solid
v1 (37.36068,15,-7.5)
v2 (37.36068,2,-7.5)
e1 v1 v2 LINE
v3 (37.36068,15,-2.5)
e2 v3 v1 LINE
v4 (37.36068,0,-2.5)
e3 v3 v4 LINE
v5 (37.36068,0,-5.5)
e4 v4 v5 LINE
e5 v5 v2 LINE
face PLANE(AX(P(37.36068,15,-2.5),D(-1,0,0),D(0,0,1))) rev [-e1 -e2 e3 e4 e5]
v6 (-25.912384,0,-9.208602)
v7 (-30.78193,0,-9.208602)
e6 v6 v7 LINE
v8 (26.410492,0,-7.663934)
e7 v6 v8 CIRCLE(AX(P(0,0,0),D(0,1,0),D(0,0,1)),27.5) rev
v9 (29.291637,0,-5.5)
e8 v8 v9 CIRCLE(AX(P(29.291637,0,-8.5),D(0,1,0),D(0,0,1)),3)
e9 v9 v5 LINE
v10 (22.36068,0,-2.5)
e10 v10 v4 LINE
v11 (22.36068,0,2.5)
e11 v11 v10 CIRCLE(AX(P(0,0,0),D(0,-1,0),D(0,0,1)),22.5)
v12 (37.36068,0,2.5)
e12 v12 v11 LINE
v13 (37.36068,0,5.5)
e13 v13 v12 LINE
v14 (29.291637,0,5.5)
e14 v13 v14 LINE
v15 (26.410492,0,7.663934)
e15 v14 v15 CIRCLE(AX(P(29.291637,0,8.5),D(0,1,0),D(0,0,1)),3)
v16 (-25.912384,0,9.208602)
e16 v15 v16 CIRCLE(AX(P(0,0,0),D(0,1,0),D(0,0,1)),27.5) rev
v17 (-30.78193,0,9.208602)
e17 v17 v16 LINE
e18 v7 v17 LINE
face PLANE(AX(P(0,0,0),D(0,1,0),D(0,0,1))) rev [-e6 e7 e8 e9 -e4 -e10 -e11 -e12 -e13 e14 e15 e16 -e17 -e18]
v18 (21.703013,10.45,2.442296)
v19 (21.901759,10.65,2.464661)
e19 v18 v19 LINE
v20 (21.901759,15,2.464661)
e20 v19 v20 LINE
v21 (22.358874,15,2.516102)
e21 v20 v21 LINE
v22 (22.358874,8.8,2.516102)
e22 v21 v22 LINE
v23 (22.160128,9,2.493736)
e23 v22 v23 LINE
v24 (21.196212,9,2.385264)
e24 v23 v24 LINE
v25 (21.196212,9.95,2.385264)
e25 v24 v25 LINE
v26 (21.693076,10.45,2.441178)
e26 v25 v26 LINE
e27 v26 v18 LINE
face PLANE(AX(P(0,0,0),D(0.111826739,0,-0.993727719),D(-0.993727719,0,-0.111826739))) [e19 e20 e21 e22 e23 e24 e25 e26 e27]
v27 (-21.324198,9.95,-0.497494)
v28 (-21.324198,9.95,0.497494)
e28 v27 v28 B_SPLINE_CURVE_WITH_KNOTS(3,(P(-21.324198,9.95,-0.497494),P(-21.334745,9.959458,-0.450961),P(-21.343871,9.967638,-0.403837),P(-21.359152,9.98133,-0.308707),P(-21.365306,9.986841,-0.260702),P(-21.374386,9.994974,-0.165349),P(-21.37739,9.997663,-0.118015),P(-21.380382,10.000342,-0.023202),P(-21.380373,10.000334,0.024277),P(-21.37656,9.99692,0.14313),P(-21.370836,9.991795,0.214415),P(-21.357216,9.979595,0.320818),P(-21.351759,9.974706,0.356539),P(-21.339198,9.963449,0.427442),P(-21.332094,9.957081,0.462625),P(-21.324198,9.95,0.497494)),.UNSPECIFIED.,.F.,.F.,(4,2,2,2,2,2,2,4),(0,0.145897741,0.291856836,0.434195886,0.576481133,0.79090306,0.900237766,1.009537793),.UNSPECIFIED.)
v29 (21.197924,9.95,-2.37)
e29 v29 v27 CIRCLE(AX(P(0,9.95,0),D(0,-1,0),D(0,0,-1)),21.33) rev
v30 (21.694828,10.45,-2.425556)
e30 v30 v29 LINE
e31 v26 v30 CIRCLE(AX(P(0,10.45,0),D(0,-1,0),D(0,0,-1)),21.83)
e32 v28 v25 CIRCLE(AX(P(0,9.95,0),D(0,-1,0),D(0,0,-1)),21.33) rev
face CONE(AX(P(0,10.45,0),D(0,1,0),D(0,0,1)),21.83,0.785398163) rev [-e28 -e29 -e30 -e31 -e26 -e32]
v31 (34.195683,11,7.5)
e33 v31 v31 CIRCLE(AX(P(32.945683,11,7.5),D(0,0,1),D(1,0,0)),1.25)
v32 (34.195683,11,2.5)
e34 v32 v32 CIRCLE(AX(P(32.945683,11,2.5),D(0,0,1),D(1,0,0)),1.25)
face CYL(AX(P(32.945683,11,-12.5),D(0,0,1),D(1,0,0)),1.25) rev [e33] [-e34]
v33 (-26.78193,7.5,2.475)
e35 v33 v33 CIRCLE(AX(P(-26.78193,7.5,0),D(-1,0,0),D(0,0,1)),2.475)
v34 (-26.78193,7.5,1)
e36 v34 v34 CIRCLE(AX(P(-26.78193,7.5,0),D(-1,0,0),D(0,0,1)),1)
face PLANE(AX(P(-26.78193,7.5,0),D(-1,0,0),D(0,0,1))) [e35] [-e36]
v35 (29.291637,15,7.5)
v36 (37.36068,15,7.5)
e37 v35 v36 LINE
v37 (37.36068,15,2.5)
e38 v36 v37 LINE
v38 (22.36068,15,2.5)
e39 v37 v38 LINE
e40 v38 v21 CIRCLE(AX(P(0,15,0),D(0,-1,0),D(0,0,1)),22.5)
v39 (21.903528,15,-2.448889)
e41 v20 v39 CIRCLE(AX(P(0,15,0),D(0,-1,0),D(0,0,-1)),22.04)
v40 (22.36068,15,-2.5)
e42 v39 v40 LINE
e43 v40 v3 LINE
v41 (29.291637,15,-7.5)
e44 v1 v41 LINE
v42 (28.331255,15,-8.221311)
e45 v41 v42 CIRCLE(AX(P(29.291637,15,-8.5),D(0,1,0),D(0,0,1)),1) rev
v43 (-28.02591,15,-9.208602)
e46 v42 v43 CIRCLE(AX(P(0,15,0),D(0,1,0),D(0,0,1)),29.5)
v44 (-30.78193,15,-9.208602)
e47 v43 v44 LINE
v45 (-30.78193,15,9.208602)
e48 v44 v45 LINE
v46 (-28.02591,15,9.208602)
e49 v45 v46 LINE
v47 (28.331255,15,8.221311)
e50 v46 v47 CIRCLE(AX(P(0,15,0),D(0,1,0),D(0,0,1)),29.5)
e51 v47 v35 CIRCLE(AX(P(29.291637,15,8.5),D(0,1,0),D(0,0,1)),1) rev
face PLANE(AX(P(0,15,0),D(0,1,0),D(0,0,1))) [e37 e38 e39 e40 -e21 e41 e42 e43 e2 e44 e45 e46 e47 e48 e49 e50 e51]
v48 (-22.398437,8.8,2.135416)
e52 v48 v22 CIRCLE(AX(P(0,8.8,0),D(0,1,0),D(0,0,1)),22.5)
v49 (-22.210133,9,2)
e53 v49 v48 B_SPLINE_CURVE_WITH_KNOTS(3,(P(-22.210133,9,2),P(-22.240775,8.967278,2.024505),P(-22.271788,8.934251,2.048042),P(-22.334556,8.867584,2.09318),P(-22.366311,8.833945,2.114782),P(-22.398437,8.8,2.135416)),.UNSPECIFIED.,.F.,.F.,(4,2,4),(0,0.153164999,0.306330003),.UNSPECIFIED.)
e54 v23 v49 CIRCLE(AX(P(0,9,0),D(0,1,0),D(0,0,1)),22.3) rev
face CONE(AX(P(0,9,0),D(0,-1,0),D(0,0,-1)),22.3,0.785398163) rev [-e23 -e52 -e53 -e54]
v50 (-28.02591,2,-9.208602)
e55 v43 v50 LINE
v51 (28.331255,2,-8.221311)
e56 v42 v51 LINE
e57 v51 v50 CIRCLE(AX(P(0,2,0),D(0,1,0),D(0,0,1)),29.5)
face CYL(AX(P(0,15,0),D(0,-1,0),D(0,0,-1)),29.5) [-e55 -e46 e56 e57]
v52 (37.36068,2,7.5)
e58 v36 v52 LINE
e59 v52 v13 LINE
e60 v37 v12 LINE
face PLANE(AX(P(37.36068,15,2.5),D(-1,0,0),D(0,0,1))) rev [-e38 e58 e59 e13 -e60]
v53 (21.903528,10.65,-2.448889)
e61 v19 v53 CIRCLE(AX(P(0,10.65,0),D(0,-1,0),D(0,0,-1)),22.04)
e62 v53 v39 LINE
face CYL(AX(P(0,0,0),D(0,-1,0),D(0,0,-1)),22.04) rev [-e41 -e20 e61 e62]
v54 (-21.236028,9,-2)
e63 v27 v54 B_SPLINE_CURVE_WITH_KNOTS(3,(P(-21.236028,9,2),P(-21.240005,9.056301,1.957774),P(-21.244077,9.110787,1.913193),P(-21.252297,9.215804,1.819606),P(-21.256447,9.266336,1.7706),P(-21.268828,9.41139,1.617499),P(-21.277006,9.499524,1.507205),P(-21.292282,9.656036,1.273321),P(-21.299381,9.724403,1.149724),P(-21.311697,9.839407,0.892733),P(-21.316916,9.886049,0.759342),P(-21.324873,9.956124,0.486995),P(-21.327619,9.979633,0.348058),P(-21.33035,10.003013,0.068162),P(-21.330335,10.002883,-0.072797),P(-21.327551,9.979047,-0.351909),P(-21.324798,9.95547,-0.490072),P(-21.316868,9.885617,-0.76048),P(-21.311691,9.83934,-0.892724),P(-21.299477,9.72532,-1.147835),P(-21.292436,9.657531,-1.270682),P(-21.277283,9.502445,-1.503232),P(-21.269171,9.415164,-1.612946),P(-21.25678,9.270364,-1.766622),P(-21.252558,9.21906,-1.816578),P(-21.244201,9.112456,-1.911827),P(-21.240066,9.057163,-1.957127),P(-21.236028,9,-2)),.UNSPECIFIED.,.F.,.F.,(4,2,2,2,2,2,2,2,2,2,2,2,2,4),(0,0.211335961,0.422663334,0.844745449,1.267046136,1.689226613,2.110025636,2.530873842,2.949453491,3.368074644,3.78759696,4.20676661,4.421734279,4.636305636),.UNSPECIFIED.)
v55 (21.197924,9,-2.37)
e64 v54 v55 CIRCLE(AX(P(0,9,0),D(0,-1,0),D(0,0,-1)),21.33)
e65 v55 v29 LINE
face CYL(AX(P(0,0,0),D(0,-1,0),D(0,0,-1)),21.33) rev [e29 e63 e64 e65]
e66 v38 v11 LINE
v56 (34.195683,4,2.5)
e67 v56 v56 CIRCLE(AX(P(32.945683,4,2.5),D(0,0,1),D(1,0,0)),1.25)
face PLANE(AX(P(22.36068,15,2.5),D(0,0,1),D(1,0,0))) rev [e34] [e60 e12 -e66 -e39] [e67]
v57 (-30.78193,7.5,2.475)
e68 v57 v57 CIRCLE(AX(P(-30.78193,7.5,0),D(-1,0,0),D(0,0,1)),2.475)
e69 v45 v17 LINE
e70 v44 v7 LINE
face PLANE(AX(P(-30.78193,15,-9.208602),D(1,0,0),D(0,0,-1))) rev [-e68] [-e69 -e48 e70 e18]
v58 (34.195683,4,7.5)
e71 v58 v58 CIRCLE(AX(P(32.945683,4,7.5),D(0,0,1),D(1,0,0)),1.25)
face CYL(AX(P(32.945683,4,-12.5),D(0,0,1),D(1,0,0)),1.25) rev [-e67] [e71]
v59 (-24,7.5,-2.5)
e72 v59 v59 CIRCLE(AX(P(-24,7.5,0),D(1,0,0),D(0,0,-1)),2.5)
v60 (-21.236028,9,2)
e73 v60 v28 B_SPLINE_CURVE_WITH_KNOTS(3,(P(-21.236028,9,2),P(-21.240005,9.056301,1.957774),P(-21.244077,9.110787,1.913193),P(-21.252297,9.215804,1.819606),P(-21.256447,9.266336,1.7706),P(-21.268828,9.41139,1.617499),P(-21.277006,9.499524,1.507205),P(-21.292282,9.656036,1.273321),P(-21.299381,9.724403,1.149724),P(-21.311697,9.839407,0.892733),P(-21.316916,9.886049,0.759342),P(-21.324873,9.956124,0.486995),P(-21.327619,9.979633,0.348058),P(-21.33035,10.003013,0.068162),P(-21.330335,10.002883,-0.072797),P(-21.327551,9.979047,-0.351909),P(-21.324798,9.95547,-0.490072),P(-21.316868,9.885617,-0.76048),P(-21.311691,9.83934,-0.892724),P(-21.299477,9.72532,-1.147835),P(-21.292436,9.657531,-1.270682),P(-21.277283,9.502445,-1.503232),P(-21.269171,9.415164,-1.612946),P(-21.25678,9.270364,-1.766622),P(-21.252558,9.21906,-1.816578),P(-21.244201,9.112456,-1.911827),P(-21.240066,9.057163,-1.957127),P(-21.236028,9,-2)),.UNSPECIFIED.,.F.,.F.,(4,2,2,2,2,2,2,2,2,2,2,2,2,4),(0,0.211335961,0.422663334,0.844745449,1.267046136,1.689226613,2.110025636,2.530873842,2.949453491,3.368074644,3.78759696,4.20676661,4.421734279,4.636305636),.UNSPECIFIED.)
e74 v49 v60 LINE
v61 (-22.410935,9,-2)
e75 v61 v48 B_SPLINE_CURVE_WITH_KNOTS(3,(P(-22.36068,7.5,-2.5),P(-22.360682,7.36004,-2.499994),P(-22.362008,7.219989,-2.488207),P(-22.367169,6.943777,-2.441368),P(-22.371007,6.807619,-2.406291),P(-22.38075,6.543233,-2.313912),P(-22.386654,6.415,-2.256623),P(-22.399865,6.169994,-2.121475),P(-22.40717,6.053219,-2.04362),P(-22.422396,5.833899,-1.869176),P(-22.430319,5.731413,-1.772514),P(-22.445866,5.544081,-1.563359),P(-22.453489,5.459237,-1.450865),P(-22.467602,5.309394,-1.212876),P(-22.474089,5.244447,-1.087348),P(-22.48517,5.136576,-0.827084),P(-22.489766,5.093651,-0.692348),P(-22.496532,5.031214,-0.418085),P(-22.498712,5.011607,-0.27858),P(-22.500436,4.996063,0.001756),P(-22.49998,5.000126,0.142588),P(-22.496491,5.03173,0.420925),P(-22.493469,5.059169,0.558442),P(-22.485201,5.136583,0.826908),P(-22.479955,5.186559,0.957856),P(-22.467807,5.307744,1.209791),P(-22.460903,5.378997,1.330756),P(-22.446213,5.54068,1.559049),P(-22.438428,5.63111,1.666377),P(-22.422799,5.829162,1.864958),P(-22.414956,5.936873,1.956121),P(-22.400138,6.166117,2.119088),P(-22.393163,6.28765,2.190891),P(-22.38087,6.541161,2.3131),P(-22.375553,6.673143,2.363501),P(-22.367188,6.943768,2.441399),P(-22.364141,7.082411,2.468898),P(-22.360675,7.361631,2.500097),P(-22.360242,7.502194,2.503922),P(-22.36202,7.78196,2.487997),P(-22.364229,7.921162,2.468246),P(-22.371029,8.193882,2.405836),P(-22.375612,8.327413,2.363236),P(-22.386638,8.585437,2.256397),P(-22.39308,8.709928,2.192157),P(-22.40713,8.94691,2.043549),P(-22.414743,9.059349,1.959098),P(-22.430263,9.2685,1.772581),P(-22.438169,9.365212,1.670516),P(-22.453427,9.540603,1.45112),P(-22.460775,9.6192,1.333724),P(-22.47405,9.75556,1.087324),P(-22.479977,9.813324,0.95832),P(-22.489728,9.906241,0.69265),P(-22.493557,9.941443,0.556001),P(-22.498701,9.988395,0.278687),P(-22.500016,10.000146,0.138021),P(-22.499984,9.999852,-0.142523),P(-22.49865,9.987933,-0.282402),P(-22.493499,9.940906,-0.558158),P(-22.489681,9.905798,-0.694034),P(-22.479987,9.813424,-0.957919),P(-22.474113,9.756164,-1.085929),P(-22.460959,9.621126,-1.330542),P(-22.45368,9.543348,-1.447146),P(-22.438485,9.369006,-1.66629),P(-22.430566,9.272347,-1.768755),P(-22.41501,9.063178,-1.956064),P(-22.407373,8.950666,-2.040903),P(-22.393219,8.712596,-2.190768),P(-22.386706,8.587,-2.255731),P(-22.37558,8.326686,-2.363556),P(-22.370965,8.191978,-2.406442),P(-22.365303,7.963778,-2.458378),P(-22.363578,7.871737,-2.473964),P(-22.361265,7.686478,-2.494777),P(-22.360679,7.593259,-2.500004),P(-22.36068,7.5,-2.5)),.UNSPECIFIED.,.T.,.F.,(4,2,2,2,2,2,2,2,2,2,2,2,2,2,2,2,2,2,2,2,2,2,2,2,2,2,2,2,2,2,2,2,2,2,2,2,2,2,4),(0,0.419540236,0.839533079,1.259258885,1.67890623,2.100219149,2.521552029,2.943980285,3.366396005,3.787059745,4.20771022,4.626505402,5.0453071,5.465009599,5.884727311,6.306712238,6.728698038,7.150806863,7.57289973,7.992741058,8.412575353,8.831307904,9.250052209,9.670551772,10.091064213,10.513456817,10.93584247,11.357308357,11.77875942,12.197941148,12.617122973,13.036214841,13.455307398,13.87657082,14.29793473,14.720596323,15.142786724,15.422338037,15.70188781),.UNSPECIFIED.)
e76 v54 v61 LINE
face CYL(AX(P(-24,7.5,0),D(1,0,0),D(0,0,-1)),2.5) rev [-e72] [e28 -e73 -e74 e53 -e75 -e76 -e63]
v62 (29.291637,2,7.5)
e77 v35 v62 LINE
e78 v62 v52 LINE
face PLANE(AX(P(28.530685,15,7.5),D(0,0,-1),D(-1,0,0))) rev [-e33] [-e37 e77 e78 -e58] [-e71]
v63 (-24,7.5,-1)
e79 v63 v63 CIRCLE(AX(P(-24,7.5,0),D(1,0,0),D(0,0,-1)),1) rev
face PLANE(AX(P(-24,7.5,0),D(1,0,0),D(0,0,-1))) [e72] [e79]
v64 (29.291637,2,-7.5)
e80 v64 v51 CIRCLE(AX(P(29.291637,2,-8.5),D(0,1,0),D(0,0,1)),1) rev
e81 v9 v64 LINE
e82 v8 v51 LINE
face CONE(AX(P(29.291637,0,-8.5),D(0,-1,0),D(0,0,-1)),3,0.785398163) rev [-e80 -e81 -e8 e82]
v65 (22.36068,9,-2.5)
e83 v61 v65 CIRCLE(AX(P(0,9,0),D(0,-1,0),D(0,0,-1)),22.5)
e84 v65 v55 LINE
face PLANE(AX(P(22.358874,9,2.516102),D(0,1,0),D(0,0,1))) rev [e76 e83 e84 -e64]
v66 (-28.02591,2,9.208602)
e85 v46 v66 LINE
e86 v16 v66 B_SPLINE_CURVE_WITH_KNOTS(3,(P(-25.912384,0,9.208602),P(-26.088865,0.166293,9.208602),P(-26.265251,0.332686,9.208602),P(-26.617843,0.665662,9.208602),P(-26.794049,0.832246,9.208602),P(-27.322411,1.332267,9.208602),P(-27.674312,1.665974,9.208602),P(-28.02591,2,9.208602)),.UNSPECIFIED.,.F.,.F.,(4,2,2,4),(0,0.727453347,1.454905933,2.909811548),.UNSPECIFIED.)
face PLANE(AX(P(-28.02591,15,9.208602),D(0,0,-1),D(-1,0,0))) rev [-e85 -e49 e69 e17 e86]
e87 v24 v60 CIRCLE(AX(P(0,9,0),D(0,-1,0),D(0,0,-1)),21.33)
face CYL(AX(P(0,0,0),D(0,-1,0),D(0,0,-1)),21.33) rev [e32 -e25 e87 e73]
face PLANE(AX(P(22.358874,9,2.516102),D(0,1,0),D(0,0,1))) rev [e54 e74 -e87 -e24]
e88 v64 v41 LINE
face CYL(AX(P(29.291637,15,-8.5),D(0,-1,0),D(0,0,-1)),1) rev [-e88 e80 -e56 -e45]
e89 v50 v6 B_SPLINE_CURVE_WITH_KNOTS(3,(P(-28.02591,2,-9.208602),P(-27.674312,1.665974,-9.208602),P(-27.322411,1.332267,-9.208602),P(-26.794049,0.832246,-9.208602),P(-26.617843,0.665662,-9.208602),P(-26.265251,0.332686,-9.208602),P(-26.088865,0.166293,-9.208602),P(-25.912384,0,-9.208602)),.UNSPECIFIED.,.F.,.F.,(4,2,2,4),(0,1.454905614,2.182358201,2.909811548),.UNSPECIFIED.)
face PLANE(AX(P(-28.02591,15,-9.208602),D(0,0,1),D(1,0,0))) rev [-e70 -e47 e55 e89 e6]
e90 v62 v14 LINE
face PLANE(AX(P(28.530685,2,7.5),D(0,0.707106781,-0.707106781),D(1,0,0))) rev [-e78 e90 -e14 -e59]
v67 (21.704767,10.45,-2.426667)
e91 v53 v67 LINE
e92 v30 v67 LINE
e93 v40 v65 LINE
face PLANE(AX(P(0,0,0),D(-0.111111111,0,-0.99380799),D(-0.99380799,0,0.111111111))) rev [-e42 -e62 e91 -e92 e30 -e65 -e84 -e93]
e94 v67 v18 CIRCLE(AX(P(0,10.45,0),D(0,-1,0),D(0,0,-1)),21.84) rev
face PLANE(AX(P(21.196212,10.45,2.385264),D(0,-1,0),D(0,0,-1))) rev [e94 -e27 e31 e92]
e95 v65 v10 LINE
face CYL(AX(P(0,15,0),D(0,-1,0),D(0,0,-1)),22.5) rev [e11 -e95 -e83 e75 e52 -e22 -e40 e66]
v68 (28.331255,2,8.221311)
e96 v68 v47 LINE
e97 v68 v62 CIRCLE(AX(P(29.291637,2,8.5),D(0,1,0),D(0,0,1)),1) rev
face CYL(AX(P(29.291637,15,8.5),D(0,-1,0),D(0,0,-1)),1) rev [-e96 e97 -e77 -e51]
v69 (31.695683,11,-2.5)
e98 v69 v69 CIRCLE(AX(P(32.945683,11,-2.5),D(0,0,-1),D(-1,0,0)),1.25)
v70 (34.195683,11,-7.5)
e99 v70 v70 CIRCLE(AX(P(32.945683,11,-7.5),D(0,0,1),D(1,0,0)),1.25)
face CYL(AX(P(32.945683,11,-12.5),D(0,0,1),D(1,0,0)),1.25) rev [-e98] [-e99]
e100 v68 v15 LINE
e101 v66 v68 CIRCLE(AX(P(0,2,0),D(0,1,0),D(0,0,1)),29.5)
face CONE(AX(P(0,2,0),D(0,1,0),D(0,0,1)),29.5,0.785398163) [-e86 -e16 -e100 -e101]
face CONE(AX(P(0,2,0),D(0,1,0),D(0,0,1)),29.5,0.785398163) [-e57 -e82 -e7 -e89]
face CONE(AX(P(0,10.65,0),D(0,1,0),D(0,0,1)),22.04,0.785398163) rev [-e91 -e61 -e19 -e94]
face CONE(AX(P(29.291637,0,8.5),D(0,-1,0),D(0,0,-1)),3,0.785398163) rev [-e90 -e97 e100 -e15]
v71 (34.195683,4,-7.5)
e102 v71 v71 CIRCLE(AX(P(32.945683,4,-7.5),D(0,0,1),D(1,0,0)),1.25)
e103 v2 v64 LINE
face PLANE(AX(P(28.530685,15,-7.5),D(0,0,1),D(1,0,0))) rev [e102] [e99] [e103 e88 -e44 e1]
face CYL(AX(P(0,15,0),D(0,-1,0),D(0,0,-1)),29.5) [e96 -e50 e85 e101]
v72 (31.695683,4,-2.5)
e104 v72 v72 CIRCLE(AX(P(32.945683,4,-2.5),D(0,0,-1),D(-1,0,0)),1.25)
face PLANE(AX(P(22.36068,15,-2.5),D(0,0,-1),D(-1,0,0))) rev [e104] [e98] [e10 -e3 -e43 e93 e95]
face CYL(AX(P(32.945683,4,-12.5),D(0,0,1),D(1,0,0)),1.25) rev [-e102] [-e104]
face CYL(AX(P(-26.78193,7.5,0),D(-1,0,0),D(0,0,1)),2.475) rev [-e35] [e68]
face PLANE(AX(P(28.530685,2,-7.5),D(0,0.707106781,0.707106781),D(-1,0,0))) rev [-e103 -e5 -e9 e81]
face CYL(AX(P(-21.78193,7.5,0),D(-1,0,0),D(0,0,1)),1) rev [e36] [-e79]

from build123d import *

# Parameters (mm, degrees)
BOSS_EXTRUDE1_DEPTH = 15
REVOLVE2_ANGLE      = 347.2
SKETCH9_R           = 1.25
CUT_EXTRUDE1_DEPTH  = 20
SKETCH10_R          = 2.475
CUT_EXTRUDE3_DEPTH  = 4
SKETCH12_R          = 1
CUT_EXTRUDE4_DEPTH  = 5
SKETCH13_R          = 2.5
CUT_EXTRUDE6_DEPTH  = 24
CHAMFER1_SIZE       = 0.2
FILLET1_R           = 1
CHAMFER2_SIZE       = 0.5
CHAMFER3_SIZE       = 2


with BuildPart() as part:
    # Sketch3 → Boss-Extrude1 (new body)
    with BuildSketch(Plane(origin=(0, 0, 0), x_dir=(1, 0, 0), z_dir=(0, 1, 0))):
        with BuildLine():
            Line((22.360679775, 2.5), (37.360679775, 2.5))
            Line((37.360679775, 2.5), (37.360679775, 7.5))
            Line((37.360679775, 7.5), (28.530685235, 7.5))
            ThreePointArc((28.530685235, 7.5), (0.890802954, 29.486547273), (-28.025910222, 9.208602294))
            Line((-28.025910222, 9.208602294), (-30.781929629, 9.208602294))
            Line((-30.781929629, 9.208602294), (-30.781929629, -9.208602294))
            Line((-30.781929629, -9.208602294), (-28.025910222, -9.208602294))
            ThreePointArc((-28.025910222, -9.208602294), (0.890802954, -29.486547273), (28.530685235, -7.5))
            Line((28.530685235, -7.5), (37.360679775, -7.5))
            Line((37.360679775, -7.5), (37.360679775, -2.5))
            Line((37.360679775, -2.5), (22.360679775, -2.5))
            ThreePointArc((22.360679775, -2.5), (-22.5, 0), (22.360679775, 2.5))
        make_face()
    extrude(amount=BOSS_EXTRUDE1_DEPTH)

    # Sketch8 → Revolve2 (revolve)
    with BuildSketch(Plane(origin=(0, 0, 0), x_dir=(-0.9938079899999066, 0, 0.11111111111111108), z_dir=(-0.11111111111111106, 0, -0.9938079899999065))):
        Polygon((-22.5, 9), (-21.33, 9), (-21.33, 10.45), (-22.04, 10.45), (-22.04, 15), (-22.5, 15), align=None)
    revolve(axis=Axis((0, 0, 0), (0, 1, 0)), revolution_arc=REVOLVE2_ANGLE)

    # Sketch9 → Cut-Extrude1 (cut)
    with BuildSketch(Plane.XY.offset(7.5)):
        with Locations((32.945682505, 11)):
            Circle(SKETCH9_R)
        with Locations((32.945682505, 4)):
            Circle(SKETCH9_R)
    extrude(amount=-CUT_EXTRUDE1_DEPTH, mode=Mode.SUBTRACT)

    # Sketch10 → Cut-Extrude3 (cut)
    with BuildSketch(Plane.ZY.offset(30.781929629)):
        with Locations((0, 7.5)):
            Circle(SKETCH10_R)
    extrude(amount=-CUT_EXTRUDE3_DEPTH, mode=Mode.SUBTRACT)

    # Sketch12 → Cut-Extrude4 (cut)
    with BuildSketch(Plane.ZY.offset(26.781929629)):
        with Locations((0, 7.5)):
            Circle(SKETCH12_R)
    extrude(amount=-CUT_EXTRUDE4_DEPTH, mode=Mode.SUBTRACT)

    # Sketch13 → Cut-Extrude6 (cut)
    with BuildSketch(Plane(origin=(0, 0, 0), x_dir=(0, 0, -1), z_dir=(1, 0, 0))):
        with Locations((0, 7.5)):
            Circle(SKETCH13_R)
    extrude(amount=-CUT_EXTRUDE6_DEPTH, mode=Mode.SUBTRACT)

    # Chamfer1
    chamfer1_edges = [part.edges().sort_by_distance(p)[0] for p in [
        (-0.259360391, 9, 22.49850511),
        (-22.039998571, 10.45, -0.007935673),
    ]]
    chamfer(chamfer1_edges, length=CHAMFER1_SIZE)

    # Fillet1
    fillet1_edges = [part.edges().sort_by_distance(p)[0] for p in [
        (28.530685235, 7.5, 7.5),
        (28.530685235, 7.5, -7.5),
    ]]
    fillet(fillet1_edges, radius=FILLET1_R)

    # Chamfer2
    # the kernel refuses this chamfer: 0.5 mm, written as the material it takes off along each edge
    with BuildSketch(Plane(origin=(0, 10.45, 0), x_dir=(0.9987152347198149, 0, -0.05067425321151771), z_dir=(0.05067425321151771, 0, 0.9987152347198149))) as chamfer2_piece_1:
        Polygon((21.33, -CHAMFER2_SIZE), (21.33 + CHAMFER2_SIZE, 0), (21.33, 0), align=None)
    revolve(axis=Axis((0, 10.45, 0), (0, 1, 0)), revolution_arc=354.149410651, mode=Mode.SUBTRACT)

    # Chamfer3
    chamfer3_edges = [part.edges().sort_by_distance(p)[0] for p in [
        (0.516715321, 0, -29.495474319),
        (33.326158403, 0, 7.5),
        (28.691090832, 0, -7.700409941),
        (28.691090832, 0, 7.700409941),
        (0.516715321, 0, 29.495474319),
        (33.326158403, 0, -7.5),
    ]]
    chamfer(chamfer3_edges, length=CHAMFER3_SIZE)


solid = part.part
